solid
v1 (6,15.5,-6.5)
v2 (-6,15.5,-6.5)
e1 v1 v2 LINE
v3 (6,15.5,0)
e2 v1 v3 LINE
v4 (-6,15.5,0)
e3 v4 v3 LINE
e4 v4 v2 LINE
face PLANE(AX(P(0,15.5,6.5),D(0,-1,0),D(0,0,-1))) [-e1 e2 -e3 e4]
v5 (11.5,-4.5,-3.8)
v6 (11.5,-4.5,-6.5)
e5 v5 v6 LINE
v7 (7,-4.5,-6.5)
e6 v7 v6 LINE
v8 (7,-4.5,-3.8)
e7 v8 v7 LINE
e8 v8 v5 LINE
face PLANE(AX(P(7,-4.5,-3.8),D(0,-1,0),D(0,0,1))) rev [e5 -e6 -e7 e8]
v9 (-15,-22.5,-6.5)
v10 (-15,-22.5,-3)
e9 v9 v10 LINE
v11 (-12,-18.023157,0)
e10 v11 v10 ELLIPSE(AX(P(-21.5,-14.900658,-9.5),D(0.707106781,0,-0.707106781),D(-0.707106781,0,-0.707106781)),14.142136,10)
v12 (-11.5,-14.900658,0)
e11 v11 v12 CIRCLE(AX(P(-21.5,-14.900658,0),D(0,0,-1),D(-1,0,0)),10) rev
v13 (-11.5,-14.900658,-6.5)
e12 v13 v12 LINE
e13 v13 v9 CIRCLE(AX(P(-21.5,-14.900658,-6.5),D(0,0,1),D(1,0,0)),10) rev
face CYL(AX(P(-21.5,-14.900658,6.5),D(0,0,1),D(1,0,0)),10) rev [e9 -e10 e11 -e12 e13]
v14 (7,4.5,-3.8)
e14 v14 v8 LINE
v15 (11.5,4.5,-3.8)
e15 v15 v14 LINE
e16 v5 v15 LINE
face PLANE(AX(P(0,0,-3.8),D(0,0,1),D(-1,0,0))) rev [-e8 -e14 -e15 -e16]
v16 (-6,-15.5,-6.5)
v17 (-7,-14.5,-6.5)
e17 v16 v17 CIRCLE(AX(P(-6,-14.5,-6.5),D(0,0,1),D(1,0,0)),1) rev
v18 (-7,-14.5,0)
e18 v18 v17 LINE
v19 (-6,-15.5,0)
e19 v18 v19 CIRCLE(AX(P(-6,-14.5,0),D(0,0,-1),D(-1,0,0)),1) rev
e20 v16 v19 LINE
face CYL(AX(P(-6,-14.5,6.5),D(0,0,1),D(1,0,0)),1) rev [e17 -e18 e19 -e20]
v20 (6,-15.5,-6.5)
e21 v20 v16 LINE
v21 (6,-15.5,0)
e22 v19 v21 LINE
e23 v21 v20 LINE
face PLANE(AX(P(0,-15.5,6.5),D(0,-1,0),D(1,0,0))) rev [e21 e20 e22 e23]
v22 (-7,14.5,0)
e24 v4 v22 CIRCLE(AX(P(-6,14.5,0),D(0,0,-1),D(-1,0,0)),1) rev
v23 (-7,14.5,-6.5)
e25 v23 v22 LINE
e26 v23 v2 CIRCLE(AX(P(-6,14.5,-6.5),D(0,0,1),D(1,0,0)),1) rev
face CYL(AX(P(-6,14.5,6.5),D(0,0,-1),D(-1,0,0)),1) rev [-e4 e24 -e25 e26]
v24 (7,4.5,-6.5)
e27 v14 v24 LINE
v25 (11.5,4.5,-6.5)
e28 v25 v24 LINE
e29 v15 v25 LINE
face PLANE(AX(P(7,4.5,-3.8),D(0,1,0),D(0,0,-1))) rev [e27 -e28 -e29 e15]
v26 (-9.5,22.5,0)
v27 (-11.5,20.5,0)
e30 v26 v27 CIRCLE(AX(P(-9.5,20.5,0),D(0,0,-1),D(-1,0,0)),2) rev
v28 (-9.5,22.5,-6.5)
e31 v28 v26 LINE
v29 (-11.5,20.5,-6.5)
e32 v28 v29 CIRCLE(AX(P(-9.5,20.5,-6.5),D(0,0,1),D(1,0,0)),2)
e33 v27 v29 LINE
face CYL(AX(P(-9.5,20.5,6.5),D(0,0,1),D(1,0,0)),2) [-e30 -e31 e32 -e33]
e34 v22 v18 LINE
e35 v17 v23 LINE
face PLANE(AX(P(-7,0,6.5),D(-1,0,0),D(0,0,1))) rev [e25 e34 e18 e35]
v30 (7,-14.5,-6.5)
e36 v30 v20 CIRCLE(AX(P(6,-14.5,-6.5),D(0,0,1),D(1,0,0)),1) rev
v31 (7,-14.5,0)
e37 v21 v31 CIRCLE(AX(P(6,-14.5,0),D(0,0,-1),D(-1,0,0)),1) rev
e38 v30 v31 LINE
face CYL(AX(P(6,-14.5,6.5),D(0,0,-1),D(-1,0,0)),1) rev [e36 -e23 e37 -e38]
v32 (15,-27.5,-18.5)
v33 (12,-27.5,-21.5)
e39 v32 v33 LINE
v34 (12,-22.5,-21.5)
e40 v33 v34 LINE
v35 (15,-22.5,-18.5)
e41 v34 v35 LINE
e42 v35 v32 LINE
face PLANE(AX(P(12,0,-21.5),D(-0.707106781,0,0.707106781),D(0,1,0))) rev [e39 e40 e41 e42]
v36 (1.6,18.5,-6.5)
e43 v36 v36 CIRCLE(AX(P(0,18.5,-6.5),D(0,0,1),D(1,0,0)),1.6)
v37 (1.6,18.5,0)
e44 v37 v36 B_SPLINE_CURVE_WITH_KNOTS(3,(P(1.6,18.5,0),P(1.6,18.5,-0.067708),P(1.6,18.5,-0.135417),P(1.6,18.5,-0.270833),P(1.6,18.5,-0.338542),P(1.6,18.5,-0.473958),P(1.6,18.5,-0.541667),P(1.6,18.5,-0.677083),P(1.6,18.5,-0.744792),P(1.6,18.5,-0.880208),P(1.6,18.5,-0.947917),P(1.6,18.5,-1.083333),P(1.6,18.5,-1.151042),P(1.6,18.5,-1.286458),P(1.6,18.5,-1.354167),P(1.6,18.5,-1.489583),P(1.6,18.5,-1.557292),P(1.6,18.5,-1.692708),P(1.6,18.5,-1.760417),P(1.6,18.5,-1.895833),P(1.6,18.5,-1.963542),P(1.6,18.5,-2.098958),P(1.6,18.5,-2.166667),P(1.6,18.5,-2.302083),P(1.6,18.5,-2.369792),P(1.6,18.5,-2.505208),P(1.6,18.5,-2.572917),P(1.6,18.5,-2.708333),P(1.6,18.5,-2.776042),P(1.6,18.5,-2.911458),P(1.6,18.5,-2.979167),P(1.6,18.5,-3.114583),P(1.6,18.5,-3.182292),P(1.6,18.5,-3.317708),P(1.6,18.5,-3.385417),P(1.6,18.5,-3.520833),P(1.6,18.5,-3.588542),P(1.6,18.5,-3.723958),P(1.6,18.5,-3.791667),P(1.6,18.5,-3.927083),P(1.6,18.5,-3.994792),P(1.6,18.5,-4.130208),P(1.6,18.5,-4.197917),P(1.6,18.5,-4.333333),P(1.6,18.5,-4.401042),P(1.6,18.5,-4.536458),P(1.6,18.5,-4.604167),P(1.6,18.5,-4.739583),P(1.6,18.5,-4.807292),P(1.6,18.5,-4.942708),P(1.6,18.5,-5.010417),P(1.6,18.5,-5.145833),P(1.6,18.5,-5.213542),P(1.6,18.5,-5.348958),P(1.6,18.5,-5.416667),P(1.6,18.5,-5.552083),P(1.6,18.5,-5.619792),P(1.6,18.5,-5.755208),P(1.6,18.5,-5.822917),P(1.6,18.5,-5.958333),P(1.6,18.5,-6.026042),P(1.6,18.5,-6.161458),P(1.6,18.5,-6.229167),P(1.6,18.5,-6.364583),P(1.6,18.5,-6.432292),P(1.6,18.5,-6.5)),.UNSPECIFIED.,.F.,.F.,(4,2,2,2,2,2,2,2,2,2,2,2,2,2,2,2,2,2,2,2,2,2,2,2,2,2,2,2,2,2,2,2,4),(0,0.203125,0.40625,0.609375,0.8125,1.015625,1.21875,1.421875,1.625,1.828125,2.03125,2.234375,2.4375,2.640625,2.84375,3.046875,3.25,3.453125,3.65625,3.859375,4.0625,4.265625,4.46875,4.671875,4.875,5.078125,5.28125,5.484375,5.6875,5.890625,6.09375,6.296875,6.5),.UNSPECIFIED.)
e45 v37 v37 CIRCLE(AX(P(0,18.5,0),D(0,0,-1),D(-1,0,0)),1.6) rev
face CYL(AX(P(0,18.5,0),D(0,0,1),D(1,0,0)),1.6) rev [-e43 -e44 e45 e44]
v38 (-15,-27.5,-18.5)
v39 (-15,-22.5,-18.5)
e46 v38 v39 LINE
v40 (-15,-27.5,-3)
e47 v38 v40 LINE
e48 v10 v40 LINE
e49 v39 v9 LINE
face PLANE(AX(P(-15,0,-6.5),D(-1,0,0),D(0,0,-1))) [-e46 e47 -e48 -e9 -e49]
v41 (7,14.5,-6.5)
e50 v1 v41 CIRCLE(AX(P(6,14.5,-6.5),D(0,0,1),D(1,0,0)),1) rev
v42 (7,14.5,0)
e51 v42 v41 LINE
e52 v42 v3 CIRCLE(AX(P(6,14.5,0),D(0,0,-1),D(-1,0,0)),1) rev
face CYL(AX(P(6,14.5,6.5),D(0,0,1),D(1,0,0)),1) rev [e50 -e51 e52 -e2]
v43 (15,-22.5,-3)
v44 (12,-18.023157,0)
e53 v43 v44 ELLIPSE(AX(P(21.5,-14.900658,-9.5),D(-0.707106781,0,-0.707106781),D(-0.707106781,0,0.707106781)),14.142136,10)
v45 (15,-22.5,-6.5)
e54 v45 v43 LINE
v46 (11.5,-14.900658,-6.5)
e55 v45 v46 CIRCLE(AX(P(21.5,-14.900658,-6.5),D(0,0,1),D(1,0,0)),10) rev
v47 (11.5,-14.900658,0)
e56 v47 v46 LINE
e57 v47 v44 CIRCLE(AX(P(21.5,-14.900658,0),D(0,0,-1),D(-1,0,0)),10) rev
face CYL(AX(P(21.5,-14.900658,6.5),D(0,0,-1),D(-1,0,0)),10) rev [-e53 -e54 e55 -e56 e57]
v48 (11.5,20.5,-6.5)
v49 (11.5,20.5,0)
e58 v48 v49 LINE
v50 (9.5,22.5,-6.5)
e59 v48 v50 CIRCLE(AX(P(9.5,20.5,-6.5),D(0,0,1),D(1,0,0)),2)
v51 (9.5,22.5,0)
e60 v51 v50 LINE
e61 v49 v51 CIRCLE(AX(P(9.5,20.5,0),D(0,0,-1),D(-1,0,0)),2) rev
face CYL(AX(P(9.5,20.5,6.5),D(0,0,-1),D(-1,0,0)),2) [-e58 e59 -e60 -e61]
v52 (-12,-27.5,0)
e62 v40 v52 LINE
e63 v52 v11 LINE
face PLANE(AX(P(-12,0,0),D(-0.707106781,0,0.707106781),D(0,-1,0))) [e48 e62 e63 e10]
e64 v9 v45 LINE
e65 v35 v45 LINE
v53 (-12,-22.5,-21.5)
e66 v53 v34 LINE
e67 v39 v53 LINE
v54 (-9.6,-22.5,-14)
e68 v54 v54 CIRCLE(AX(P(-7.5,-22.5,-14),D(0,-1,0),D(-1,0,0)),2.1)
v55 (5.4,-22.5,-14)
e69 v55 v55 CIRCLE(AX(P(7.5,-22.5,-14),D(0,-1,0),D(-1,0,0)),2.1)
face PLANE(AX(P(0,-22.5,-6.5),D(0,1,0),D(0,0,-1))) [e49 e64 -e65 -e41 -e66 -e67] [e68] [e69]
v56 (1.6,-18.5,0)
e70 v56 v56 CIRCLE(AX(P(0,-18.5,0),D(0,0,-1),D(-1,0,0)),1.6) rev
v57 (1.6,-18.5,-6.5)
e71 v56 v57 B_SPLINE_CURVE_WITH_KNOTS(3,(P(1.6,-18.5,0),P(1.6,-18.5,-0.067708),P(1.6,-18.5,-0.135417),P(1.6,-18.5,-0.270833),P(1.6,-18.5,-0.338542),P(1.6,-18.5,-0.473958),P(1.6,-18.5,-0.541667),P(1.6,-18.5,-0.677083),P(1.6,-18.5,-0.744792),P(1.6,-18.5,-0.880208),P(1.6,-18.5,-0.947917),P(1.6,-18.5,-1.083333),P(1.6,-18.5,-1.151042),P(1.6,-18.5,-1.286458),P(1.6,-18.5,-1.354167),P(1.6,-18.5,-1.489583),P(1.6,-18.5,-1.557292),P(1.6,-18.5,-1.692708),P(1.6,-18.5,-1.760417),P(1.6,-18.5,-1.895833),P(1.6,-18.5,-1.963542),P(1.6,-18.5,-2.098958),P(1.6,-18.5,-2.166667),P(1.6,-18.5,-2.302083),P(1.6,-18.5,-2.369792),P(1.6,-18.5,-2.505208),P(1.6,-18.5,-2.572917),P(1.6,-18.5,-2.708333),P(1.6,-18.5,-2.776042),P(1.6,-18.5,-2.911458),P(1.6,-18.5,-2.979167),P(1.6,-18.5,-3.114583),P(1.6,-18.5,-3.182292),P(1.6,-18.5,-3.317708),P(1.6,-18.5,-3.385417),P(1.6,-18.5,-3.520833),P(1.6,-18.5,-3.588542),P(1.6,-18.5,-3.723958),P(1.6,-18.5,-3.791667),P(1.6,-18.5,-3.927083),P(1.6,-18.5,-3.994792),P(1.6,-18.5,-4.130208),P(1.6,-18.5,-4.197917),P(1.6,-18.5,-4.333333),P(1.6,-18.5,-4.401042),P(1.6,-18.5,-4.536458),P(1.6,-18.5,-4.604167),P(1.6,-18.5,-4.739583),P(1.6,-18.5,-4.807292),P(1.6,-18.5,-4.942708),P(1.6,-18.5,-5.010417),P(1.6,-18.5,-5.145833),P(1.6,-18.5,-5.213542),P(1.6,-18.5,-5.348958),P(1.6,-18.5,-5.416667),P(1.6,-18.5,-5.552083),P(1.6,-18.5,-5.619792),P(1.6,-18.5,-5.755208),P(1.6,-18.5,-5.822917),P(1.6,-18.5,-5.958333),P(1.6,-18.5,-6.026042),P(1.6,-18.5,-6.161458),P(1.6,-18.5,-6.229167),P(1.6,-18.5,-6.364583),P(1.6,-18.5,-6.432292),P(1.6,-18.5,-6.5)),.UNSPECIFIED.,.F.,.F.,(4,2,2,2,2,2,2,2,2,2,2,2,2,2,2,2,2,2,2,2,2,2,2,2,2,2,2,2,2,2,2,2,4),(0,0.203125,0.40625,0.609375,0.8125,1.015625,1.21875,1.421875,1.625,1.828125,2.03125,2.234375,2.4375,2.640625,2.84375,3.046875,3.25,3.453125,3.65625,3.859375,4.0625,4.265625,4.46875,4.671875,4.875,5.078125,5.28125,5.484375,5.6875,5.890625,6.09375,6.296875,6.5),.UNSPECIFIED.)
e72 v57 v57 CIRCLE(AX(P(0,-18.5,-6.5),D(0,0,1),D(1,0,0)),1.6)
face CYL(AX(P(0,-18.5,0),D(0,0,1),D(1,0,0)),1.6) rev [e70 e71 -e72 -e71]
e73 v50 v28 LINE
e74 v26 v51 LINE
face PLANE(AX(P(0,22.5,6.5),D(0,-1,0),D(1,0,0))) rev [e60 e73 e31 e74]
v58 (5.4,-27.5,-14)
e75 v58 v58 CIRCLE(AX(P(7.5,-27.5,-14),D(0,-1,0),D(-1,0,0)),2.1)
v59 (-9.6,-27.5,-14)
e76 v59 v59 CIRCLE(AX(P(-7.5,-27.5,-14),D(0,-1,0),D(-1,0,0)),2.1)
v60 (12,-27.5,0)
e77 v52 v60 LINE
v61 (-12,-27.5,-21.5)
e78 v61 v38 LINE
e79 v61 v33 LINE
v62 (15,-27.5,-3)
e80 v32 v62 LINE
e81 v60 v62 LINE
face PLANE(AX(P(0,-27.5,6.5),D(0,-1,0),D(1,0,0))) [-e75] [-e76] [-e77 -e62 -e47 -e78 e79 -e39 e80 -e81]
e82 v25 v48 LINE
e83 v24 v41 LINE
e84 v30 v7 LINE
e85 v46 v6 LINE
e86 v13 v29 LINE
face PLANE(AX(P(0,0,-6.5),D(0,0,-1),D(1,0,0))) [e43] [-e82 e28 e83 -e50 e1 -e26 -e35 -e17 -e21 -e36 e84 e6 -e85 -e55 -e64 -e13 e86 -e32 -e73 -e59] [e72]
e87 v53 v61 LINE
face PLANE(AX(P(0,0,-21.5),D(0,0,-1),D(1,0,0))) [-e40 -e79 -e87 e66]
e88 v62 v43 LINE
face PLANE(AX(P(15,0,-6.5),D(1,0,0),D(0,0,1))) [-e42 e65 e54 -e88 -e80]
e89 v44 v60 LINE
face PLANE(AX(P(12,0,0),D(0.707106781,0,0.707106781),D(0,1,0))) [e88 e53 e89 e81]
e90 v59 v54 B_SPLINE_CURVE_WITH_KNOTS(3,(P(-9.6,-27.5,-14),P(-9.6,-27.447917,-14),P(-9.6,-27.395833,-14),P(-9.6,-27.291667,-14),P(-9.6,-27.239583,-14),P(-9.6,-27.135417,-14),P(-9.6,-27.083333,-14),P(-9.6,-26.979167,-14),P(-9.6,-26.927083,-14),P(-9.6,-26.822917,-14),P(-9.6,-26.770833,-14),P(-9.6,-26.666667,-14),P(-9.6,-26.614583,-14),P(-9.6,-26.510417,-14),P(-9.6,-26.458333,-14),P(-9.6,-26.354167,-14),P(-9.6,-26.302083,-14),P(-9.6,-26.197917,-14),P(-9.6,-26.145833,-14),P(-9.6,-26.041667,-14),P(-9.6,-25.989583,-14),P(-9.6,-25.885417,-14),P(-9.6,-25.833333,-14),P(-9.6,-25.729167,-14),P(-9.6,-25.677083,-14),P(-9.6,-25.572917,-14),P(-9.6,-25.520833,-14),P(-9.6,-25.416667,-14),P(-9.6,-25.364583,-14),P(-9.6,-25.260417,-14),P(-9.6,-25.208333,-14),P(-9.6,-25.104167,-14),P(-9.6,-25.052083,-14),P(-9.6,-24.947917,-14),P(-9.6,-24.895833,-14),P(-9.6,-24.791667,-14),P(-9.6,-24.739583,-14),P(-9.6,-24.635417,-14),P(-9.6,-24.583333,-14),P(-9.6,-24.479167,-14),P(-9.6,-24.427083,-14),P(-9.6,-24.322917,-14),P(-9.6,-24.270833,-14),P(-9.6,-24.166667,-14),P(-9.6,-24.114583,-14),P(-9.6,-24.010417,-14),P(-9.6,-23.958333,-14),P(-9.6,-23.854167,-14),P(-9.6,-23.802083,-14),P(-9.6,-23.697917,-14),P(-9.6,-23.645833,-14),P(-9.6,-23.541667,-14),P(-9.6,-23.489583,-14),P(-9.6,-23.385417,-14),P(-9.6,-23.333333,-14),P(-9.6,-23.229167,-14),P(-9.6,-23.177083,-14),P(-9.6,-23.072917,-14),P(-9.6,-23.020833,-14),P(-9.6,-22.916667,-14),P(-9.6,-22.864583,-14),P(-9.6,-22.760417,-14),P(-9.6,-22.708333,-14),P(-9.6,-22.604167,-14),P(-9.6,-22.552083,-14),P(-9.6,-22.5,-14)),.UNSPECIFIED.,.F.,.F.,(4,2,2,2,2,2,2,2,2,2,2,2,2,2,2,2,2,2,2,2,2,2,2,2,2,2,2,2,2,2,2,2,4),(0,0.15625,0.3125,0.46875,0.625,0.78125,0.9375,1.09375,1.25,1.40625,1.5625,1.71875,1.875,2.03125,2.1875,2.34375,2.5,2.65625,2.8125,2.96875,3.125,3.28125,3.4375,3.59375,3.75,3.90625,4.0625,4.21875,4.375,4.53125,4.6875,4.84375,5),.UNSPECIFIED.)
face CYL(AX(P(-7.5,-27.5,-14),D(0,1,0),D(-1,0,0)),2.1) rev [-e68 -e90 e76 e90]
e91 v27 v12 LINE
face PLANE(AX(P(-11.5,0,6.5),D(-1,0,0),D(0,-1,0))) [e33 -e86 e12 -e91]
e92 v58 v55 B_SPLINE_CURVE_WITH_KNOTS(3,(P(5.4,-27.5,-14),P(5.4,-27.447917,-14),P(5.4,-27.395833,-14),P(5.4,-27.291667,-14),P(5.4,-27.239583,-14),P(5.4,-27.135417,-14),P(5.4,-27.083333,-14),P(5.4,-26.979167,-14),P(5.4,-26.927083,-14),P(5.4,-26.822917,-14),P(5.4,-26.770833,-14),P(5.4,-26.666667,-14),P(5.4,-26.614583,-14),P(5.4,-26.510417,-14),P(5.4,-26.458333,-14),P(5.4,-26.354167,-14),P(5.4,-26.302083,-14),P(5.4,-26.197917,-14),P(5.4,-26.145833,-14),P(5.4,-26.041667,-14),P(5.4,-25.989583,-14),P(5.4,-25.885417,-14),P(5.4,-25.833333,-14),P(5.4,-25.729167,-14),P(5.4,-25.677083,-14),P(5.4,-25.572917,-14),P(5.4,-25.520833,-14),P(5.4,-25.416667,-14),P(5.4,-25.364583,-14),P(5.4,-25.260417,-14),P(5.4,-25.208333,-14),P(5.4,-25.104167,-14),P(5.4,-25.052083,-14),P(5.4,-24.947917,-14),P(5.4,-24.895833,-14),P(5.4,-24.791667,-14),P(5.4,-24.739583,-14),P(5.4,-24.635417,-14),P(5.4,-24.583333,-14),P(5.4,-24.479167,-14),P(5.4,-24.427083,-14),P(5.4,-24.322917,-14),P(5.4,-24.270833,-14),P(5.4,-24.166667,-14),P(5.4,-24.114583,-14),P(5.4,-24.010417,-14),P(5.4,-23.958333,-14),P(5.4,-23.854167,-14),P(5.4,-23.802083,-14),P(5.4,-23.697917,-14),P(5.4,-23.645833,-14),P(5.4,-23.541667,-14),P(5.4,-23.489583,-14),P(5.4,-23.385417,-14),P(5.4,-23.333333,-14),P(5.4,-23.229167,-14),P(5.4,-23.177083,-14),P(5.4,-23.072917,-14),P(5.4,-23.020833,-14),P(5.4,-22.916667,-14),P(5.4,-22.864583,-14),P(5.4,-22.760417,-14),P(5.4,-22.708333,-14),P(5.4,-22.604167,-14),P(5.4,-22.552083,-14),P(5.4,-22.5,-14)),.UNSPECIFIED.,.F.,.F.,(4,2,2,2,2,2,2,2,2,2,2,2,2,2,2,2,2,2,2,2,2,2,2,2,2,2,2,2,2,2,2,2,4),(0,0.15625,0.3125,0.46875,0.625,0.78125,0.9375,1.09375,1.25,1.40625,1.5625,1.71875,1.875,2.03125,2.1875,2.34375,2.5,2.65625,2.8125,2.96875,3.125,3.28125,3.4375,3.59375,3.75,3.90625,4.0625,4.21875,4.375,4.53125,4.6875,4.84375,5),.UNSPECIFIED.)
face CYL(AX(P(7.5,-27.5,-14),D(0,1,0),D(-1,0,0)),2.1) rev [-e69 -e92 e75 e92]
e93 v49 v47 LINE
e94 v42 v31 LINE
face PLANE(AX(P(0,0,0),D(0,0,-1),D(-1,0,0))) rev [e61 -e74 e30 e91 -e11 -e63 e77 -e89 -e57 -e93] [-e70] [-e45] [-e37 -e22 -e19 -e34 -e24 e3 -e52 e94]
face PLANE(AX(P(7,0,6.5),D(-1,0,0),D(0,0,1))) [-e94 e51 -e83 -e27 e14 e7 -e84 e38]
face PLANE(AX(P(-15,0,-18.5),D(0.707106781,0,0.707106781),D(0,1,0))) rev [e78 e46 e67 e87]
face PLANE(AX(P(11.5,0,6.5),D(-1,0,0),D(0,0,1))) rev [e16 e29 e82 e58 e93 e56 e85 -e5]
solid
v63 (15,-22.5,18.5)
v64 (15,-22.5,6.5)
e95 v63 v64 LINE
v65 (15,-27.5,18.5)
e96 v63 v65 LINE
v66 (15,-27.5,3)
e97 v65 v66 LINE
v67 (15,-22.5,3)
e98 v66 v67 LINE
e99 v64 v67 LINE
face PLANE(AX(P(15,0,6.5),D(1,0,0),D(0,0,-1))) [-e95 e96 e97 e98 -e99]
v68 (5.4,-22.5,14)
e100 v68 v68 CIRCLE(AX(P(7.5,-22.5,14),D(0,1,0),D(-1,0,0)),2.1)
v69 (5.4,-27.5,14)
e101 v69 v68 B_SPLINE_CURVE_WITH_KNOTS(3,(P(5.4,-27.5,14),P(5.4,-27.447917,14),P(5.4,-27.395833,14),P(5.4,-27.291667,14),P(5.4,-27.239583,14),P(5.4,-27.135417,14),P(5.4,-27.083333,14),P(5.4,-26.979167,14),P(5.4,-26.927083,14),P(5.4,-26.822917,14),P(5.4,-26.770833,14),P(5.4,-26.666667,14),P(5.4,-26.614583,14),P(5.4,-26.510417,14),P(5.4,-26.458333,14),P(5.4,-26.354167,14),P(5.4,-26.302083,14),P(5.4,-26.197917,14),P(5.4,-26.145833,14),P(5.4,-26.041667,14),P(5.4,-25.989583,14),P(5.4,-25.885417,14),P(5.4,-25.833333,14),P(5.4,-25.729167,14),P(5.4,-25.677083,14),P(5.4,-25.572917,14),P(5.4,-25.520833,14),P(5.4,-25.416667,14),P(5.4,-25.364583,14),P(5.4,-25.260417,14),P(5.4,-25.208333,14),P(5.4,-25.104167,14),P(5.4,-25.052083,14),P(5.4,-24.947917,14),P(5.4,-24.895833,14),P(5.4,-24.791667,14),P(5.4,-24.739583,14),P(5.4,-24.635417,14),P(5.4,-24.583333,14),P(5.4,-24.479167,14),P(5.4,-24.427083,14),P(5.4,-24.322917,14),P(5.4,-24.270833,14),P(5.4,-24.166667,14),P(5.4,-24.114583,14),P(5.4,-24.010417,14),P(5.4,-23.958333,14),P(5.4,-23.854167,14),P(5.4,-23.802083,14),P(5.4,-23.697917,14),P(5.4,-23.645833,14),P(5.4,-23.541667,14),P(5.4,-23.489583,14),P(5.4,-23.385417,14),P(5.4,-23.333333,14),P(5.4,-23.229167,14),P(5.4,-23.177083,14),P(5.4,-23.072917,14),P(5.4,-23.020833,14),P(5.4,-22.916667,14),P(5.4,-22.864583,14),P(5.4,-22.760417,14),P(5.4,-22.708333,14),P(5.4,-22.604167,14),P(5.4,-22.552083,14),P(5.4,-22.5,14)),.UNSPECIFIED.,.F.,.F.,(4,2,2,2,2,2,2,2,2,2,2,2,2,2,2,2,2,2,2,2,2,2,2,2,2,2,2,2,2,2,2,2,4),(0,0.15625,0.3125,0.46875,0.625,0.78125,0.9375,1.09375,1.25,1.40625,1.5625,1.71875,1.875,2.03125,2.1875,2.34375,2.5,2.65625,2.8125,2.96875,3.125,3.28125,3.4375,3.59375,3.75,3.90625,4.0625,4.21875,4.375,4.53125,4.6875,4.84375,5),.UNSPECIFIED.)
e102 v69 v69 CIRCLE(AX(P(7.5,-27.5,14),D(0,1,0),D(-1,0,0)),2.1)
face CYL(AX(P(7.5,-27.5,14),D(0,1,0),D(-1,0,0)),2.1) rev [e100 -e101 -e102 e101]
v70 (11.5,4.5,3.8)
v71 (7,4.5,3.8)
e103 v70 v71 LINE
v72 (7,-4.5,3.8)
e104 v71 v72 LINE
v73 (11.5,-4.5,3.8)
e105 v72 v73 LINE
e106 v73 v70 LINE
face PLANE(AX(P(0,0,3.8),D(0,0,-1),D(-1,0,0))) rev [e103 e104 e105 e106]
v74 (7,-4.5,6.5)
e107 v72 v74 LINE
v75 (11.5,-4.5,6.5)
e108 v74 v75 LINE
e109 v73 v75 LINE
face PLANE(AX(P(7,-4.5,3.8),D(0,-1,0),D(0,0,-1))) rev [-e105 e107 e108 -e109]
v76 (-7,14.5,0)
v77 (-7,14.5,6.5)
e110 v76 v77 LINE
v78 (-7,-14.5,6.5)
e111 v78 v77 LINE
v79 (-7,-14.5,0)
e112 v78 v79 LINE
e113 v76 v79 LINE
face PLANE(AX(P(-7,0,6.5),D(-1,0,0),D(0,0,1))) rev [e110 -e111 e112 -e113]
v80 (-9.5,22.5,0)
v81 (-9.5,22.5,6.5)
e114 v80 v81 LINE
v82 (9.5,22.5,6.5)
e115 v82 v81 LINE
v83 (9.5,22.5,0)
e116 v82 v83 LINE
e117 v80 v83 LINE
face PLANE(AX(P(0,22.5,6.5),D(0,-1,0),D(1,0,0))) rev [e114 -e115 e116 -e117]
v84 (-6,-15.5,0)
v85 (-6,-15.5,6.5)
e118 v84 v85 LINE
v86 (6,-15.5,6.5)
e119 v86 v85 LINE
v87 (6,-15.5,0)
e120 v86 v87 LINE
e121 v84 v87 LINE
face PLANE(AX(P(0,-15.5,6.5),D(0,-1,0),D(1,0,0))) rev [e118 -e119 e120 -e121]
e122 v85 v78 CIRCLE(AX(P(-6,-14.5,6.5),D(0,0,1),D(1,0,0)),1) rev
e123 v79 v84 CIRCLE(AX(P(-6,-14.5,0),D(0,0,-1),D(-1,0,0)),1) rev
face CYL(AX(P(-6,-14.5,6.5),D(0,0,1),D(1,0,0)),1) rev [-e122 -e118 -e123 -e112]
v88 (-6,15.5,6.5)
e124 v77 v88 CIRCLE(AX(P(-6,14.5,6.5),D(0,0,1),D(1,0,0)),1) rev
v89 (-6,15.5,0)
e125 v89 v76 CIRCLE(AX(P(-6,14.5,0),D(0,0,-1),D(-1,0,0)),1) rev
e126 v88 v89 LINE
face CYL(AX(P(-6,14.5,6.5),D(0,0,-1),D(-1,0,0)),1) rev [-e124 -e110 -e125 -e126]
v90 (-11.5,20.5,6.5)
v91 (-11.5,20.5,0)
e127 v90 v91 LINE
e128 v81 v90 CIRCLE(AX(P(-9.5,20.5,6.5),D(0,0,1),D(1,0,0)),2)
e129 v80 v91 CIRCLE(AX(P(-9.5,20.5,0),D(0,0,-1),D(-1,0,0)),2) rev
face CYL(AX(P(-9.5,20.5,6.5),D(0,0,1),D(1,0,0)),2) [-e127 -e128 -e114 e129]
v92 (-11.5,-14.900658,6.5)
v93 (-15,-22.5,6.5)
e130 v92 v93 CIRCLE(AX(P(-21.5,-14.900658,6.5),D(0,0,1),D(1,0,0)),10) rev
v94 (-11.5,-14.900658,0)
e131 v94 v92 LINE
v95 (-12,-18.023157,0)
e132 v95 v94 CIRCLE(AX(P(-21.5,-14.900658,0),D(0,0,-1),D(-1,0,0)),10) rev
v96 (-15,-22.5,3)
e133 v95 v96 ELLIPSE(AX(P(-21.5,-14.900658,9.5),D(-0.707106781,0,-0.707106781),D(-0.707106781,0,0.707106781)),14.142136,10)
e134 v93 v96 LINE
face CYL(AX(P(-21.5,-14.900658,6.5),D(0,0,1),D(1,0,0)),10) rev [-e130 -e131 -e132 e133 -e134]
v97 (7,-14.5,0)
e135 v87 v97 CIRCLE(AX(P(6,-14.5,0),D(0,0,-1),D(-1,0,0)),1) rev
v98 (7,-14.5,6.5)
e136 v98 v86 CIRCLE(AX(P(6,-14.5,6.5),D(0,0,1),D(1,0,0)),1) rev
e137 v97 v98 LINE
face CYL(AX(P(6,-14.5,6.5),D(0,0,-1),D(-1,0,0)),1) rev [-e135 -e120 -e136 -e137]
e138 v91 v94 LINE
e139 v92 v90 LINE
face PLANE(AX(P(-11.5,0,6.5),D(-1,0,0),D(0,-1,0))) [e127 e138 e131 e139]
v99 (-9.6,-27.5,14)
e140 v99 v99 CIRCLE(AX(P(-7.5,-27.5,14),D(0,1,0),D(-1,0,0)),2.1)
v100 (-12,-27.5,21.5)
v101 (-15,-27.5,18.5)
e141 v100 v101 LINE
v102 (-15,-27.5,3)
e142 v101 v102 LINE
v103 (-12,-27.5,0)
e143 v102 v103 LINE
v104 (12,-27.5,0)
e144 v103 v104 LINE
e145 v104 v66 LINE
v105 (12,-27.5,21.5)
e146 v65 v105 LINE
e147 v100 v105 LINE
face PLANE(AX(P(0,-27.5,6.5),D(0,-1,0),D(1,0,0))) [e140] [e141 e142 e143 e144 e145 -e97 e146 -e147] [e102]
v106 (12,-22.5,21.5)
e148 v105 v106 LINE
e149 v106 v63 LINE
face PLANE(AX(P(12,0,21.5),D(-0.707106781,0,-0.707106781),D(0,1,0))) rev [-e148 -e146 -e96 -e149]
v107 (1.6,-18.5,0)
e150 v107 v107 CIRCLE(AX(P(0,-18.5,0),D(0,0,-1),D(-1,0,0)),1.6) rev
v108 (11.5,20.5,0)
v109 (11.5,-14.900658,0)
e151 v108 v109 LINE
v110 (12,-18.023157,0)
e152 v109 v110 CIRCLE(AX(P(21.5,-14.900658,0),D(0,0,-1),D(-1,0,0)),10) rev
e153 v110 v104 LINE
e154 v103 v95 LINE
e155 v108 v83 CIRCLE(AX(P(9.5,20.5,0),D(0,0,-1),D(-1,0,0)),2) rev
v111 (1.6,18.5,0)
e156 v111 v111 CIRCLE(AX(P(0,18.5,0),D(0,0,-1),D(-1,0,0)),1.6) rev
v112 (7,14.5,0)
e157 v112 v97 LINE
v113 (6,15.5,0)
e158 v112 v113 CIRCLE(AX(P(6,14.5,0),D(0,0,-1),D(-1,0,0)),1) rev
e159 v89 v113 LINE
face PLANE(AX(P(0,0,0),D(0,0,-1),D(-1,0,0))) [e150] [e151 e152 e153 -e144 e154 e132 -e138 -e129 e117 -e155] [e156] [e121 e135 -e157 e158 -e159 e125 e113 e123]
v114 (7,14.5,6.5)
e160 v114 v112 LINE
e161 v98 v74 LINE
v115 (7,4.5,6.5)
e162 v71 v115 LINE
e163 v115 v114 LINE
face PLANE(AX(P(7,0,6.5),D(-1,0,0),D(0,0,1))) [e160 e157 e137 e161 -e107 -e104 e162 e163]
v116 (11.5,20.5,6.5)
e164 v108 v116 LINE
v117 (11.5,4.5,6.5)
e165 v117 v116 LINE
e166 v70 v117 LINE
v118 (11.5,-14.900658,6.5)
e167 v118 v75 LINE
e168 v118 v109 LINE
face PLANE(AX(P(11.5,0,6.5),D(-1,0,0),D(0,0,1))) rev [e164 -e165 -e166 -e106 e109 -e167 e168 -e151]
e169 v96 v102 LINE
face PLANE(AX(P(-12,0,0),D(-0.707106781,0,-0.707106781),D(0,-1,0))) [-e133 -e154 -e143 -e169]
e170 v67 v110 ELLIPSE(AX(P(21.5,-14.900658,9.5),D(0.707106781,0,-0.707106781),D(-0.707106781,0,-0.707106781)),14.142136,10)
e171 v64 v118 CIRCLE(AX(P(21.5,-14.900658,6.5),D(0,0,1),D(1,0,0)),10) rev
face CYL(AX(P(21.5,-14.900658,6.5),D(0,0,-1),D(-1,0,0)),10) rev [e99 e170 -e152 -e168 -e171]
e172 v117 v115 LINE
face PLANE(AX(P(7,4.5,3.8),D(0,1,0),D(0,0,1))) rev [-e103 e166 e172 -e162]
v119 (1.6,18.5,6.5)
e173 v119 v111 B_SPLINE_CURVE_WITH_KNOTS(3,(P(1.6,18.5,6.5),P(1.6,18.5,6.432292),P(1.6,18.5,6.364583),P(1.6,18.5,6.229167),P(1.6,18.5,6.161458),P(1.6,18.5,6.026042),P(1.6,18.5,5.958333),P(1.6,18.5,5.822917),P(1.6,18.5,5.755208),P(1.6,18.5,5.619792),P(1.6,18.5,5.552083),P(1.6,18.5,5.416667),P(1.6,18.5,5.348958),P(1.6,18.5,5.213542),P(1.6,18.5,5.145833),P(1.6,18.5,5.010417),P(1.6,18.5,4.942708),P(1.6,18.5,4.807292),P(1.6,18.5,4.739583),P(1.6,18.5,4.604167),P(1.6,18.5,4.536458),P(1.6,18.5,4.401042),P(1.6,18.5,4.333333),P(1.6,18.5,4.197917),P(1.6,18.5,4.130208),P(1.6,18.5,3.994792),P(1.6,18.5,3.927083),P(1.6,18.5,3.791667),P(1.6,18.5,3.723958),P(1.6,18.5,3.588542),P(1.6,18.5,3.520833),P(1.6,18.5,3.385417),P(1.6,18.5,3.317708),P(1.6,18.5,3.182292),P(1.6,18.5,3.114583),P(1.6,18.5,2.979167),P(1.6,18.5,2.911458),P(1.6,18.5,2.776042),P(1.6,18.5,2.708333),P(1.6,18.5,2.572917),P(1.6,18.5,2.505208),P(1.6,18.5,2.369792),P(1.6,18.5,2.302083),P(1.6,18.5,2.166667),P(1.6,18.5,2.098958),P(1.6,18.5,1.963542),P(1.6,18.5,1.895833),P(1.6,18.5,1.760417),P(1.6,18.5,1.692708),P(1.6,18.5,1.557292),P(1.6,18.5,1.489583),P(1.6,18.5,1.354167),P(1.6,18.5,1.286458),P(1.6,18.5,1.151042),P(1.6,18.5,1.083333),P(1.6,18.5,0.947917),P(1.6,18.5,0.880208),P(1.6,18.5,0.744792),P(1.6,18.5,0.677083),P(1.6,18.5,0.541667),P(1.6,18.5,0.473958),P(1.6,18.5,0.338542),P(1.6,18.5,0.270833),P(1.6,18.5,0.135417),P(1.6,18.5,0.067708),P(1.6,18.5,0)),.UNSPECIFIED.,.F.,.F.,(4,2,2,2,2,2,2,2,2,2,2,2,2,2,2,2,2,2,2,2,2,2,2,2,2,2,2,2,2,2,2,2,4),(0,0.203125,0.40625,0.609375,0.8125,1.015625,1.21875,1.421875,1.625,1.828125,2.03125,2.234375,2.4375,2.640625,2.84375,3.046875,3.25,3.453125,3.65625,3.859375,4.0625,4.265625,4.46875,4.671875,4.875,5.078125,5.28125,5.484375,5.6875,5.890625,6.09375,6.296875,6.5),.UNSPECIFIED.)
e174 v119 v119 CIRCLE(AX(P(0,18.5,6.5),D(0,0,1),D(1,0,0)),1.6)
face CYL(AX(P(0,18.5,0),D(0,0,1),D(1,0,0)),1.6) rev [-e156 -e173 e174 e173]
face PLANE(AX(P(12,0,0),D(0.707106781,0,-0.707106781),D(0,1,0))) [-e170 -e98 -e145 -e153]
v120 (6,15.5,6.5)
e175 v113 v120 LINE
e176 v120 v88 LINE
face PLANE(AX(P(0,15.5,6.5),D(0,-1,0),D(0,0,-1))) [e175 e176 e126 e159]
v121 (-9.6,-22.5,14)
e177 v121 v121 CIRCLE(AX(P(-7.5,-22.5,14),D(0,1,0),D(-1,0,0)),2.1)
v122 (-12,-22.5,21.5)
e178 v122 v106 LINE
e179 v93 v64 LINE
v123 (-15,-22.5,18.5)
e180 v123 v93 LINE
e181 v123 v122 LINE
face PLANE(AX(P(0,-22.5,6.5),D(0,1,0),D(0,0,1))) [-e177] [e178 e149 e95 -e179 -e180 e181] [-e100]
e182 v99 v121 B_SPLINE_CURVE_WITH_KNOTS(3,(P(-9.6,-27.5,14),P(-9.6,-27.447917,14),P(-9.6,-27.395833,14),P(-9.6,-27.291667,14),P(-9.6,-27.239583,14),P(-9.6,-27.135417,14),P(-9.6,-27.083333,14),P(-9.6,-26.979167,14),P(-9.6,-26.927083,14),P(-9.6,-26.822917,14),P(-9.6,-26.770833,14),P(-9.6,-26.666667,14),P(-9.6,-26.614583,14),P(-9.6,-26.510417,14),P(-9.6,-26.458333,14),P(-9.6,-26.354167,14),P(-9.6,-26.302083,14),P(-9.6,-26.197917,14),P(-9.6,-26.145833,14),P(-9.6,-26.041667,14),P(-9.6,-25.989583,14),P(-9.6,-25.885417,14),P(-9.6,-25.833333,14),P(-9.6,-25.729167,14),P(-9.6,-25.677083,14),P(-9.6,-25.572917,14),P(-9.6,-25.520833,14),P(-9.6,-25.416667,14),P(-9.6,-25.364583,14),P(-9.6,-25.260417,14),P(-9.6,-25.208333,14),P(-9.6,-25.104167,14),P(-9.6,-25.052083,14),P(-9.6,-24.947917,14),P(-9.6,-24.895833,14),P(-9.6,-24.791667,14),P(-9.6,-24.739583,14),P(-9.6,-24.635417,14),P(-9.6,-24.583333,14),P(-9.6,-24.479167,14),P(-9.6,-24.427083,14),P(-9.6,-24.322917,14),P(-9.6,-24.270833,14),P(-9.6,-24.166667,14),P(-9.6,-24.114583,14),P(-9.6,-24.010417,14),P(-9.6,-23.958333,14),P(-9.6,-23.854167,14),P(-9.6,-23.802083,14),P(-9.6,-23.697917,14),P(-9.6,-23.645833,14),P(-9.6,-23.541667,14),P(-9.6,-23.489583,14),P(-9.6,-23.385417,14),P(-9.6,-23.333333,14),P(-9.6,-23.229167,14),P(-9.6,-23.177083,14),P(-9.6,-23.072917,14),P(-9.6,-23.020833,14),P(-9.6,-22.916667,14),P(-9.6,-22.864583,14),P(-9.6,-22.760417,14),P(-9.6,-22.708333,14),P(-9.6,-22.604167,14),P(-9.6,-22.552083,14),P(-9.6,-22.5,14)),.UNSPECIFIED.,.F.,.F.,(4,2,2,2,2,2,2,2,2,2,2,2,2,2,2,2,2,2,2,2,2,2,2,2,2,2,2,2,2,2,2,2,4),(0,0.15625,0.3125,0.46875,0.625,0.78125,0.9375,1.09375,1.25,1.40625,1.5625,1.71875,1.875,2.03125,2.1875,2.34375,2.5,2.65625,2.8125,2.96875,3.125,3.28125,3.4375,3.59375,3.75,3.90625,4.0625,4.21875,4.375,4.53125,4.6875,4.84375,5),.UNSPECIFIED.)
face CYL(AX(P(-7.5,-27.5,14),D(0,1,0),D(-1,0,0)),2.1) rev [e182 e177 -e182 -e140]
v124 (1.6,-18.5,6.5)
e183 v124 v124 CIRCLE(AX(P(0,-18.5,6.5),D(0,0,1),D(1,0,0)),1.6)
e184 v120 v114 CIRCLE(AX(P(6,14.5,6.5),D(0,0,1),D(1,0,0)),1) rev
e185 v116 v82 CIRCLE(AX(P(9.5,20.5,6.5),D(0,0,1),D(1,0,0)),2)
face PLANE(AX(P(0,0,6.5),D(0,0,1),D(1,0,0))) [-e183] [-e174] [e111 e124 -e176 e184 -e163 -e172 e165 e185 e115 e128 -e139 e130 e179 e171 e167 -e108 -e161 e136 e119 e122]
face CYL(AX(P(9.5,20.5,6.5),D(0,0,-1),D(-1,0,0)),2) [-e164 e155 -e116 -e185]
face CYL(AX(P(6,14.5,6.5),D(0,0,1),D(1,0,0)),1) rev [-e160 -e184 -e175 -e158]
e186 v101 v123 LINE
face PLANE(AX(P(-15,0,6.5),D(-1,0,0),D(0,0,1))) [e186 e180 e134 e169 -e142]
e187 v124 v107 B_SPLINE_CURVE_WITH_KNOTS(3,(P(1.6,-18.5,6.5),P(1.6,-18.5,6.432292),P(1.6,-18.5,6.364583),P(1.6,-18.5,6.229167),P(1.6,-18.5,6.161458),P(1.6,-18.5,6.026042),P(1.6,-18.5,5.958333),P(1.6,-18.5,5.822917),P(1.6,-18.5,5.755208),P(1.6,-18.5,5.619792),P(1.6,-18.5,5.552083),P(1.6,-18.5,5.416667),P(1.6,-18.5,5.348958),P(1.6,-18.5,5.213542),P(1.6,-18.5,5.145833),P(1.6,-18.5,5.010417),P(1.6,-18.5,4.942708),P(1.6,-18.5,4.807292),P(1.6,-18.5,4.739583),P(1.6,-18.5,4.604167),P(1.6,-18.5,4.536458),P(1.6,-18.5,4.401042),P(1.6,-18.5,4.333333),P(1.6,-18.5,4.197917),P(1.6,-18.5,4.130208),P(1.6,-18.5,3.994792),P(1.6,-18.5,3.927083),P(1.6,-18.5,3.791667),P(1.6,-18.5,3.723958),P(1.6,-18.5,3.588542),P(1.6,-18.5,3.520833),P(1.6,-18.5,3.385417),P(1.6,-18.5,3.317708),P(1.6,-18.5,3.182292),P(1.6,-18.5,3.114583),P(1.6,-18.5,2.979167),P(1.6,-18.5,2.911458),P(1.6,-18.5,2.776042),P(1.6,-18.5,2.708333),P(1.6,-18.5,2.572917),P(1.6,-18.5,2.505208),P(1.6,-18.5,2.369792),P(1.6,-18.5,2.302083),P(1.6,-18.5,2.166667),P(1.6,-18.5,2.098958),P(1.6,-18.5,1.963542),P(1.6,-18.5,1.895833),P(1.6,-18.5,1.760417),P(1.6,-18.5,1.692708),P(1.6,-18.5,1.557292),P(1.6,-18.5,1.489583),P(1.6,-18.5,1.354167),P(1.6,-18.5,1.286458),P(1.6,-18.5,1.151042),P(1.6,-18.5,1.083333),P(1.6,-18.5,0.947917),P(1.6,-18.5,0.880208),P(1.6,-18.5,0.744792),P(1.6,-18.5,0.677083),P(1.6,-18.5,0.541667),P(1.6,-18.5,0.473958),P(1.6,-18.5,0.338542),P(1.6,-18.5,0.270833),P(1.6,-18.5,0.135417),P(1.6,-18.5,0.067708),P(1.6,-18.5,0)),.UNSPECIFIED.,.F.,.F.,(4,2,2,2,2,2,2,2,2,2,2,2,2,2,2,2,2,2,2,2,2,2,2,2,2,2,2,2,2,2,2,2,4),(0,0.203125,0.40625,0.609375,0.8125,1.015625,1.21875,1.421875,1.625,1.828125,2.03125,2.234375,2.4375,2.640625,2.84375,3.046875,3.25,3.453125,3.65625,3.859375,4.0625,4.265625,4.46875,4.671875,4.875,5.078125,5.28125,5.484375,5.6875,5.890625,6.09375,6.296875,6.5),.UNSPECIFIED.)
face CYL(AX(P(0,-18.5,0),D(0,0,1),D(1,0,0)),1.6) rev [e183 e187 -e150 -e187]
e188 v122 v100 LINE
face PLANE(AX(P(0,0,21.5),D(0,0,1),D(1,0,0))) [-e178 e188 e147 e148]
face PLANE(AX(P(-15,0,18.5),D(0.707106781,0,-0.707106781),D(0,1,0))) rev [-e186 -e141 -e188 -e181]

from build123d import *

# Parameters (mm, degrees)
SKETCH_1_W             = 14
SKETCH_1_H             = 31
EXTRUDE_1_DEPTH        = 6.5
SKETCH_2_W             = 30
SKETCH_2_H             = 5
EXTRUDE_2_DEPTH        = 15
SKETCH_3_W             = 4.5
SKETCH_3_H             = 9
CUT_EXTRUDE_1_DEPTH    = 2.7
SKETCH_4_R             = 1.6
CUT_EXTRUDE_2_DEPTH    = 35.731109974
PATTERN_LINEAR_1_COUNT = 2
PATTERN_LINEAR_1_PITCH = 37
SKETCH_5_R             = 2.1
CUT_EXTRUDE_3_DEPTH    = 53.079266508
FILLET_2_R             = 2
FILLET_3_R             = 10
CHAMFER_1_SIZE         = 3
FILLET_4_R             = 1


with BuildPart() as part:
    # 草圖1 → 填料-伸長1 (new body)
    with BuildSketch(Plane.XY):
        Polygon((11.5, -22.5), (11.5, 22.5), (-11.5, 22.5), (-11.5, -22.5), (-15, -22.5), (-15, -27.5), (15, -27.5), (15, -22.5), align=None)
        Rectangle(SKETCH_1_W, SKETCH_1_H, mode=Mode.SUBTRACT)
    extrude(amount=EXTRUDE_1_DEPTH)

    # 草圖2 → 填料-伸長2 (add)
    with BuildSketch(Plane.XY.offset(6.5)):
        with Locations((0, -25)):
            Rectangle(SKETCH_2_W, SKETCH_2_H)
    extrude(amount=EXTRUDE_2_DEPTH)

    # 草圖3 → 除料-伸長1 (cut)
    with BuildSketch(Plane.XY.offset(6.5)):
        with Locations((9.25, 0)):
            Rectangle(SKETCH_3_W, SKETCH_3_H)
    extrude(amount=-CUT_EXTRUDE_1_DEPTH, mode=Mode.SUBTRACT)

    # 草圖4 → 除料-伸長2 (cut, through all)
    with BuildSketch(Plane.XY.offset(6.5)):
        with Locations((0, 18.5)):
            Circle(SKETCH_4_R)
    cut_extrude_2 = extrude(amount=-CUT_EXTRUDE_2_DEPTH, mode=Mode.SUBTRACT)

    # 直線複製排列1: 除料-伸長2 ×2
    with Locations(*[(0, -i * PATTERN_LINEAR_1_PITCH, 0) for i in range(1, PATTERN_LINEAR_1_COUNT)]):
        add(cut_extrude_2, mode=Mode.SUBTRACT)

    # 草圖5 → 除料-伸長3 (cut, through all)
    with BuildSketch(Plane(origin=(0, -22.5, 0), x_dir=(1, 0, 0), z_dir=(0, 1, 0))):
        with Locations(Location((-7.5, -14, 0), (0, 0, 180))):
            Circle(SKETCH_5_R)
        with Locations(Location((7.5, -14, 0), (0, 0, 180))):
            Circle(SKETCH_5_R)
    extrude(amount=-CUT_EXTRUDE_3_DEPTH, mode=Mode.SUBTRACT)

    # 圓角2
    fillet_2_edges = [part.edges().sort_by_distance(p)[0] for p in [
        (-11.5, 22.5, 3.25),
        (11.5, 22.5, 3.25),
    ]]
    fillet(fillet_2_edges, radius=FILLET_2_R)

    # 圓角3
    # the kernel refuses this fillet: 10 mm, written as the material it adds along each edge
    with BuildSketch(Plane(origin=(-11.5, -22.5, 0), x_dir=(-1, 0, 0), z_dir=(0, 0, 1))) as fillet_3_piece_1:
        with BuildLine():
            CenterArc((10, -7.599342077), FILLET_3_R, 130.541601874, 49.458398126)
            Line((0, -7.599342077), (-0.2, -7.599342077))
            Line((-0.2, -7.599342077), (-0.2, 0))
            Line((-0.2, 0), (0, 0.2))
            ThreePointArc((0, 0.2), (1.75, 0.2), (3.37, 0.151986842))
            Line((3.37, 0.151986842), (3.5, 0))
        make_face()
    extrude(amount=6.5)
    with BuildSketch(Plane(origin=(11.5, -22.5, 0), x_dir=(0, 1, 0), z_dir=(0, 0, 1))) as fillet_3_piece_2:
        with BuildLine():
            CenterArc((7.599342077, -10), FILLET_3_R, 90, 49.458398126)
            Line((0, -3.5), (-0.151986842, -3.37))
            ThreePointArc((-0.151986842, -3.37), (-0.2, -1.75), (-0.2, 0))
            Line((-0.2, 0), (0, 0.2))
            Line((0, 0.2), (7.599342077, 0.2))
            Line((7.599342077, 0.2), (7.599342077, 0))
        make_face()
    extrude(amount=6.5)

    # 導角1
    chamfer_1_edges = [part.edges().sort_by_distance(p)[0] for p in [
        (-15, -25, 0),
        (15, -25, 0),
        (-15, -25, 21.5),
        (15, -25, 21.5),
    ]]
    chamfer(chamfer_1_edges, length=CHAMFER_1_SIZE)

    # 圓角4
    fillet_4_edges = [part.edges().sort_by_distance(p)[0] for p in [
        (7, -15.5, 3.25),
        (7, 15.5, 3.25),
        (-7, 15.5, 3.25),
        (-7, -15.5, 3.25),
    ]]
    fillet(fillet_4_edges, radius=FILLET_4_R)

    # 鏡射2: part across plane


with BuildPart() as part_1:
    add(part.part)
    add(part.part.mirror(Plane(origin=(0, 0, 0), x_dir=(1, 0, 0), z_dir=(0, 0, -1))))


with BuildPart() as body_2:
    # Split Bodies 1: the piece on the far side of the plane
    add(part_1.part)
    split(bisect_by=Plane(origin=(0, 0, 0), x_dir=(-1, 0, 0), z_dir=(0, 0, -1)), keep=Keep.BOTTOM)


with BuildPart() as part_2:
    add(part_1.part)

    # Split Bodies 1
    split(bisect_by=Plane(origin=(0, 0, 0), x_dir=(-1, 0, 0), z_dir=(0, 0, -1)), keep=Keep.TOP)


solid = Compound([body_2.part, part_2.part])
